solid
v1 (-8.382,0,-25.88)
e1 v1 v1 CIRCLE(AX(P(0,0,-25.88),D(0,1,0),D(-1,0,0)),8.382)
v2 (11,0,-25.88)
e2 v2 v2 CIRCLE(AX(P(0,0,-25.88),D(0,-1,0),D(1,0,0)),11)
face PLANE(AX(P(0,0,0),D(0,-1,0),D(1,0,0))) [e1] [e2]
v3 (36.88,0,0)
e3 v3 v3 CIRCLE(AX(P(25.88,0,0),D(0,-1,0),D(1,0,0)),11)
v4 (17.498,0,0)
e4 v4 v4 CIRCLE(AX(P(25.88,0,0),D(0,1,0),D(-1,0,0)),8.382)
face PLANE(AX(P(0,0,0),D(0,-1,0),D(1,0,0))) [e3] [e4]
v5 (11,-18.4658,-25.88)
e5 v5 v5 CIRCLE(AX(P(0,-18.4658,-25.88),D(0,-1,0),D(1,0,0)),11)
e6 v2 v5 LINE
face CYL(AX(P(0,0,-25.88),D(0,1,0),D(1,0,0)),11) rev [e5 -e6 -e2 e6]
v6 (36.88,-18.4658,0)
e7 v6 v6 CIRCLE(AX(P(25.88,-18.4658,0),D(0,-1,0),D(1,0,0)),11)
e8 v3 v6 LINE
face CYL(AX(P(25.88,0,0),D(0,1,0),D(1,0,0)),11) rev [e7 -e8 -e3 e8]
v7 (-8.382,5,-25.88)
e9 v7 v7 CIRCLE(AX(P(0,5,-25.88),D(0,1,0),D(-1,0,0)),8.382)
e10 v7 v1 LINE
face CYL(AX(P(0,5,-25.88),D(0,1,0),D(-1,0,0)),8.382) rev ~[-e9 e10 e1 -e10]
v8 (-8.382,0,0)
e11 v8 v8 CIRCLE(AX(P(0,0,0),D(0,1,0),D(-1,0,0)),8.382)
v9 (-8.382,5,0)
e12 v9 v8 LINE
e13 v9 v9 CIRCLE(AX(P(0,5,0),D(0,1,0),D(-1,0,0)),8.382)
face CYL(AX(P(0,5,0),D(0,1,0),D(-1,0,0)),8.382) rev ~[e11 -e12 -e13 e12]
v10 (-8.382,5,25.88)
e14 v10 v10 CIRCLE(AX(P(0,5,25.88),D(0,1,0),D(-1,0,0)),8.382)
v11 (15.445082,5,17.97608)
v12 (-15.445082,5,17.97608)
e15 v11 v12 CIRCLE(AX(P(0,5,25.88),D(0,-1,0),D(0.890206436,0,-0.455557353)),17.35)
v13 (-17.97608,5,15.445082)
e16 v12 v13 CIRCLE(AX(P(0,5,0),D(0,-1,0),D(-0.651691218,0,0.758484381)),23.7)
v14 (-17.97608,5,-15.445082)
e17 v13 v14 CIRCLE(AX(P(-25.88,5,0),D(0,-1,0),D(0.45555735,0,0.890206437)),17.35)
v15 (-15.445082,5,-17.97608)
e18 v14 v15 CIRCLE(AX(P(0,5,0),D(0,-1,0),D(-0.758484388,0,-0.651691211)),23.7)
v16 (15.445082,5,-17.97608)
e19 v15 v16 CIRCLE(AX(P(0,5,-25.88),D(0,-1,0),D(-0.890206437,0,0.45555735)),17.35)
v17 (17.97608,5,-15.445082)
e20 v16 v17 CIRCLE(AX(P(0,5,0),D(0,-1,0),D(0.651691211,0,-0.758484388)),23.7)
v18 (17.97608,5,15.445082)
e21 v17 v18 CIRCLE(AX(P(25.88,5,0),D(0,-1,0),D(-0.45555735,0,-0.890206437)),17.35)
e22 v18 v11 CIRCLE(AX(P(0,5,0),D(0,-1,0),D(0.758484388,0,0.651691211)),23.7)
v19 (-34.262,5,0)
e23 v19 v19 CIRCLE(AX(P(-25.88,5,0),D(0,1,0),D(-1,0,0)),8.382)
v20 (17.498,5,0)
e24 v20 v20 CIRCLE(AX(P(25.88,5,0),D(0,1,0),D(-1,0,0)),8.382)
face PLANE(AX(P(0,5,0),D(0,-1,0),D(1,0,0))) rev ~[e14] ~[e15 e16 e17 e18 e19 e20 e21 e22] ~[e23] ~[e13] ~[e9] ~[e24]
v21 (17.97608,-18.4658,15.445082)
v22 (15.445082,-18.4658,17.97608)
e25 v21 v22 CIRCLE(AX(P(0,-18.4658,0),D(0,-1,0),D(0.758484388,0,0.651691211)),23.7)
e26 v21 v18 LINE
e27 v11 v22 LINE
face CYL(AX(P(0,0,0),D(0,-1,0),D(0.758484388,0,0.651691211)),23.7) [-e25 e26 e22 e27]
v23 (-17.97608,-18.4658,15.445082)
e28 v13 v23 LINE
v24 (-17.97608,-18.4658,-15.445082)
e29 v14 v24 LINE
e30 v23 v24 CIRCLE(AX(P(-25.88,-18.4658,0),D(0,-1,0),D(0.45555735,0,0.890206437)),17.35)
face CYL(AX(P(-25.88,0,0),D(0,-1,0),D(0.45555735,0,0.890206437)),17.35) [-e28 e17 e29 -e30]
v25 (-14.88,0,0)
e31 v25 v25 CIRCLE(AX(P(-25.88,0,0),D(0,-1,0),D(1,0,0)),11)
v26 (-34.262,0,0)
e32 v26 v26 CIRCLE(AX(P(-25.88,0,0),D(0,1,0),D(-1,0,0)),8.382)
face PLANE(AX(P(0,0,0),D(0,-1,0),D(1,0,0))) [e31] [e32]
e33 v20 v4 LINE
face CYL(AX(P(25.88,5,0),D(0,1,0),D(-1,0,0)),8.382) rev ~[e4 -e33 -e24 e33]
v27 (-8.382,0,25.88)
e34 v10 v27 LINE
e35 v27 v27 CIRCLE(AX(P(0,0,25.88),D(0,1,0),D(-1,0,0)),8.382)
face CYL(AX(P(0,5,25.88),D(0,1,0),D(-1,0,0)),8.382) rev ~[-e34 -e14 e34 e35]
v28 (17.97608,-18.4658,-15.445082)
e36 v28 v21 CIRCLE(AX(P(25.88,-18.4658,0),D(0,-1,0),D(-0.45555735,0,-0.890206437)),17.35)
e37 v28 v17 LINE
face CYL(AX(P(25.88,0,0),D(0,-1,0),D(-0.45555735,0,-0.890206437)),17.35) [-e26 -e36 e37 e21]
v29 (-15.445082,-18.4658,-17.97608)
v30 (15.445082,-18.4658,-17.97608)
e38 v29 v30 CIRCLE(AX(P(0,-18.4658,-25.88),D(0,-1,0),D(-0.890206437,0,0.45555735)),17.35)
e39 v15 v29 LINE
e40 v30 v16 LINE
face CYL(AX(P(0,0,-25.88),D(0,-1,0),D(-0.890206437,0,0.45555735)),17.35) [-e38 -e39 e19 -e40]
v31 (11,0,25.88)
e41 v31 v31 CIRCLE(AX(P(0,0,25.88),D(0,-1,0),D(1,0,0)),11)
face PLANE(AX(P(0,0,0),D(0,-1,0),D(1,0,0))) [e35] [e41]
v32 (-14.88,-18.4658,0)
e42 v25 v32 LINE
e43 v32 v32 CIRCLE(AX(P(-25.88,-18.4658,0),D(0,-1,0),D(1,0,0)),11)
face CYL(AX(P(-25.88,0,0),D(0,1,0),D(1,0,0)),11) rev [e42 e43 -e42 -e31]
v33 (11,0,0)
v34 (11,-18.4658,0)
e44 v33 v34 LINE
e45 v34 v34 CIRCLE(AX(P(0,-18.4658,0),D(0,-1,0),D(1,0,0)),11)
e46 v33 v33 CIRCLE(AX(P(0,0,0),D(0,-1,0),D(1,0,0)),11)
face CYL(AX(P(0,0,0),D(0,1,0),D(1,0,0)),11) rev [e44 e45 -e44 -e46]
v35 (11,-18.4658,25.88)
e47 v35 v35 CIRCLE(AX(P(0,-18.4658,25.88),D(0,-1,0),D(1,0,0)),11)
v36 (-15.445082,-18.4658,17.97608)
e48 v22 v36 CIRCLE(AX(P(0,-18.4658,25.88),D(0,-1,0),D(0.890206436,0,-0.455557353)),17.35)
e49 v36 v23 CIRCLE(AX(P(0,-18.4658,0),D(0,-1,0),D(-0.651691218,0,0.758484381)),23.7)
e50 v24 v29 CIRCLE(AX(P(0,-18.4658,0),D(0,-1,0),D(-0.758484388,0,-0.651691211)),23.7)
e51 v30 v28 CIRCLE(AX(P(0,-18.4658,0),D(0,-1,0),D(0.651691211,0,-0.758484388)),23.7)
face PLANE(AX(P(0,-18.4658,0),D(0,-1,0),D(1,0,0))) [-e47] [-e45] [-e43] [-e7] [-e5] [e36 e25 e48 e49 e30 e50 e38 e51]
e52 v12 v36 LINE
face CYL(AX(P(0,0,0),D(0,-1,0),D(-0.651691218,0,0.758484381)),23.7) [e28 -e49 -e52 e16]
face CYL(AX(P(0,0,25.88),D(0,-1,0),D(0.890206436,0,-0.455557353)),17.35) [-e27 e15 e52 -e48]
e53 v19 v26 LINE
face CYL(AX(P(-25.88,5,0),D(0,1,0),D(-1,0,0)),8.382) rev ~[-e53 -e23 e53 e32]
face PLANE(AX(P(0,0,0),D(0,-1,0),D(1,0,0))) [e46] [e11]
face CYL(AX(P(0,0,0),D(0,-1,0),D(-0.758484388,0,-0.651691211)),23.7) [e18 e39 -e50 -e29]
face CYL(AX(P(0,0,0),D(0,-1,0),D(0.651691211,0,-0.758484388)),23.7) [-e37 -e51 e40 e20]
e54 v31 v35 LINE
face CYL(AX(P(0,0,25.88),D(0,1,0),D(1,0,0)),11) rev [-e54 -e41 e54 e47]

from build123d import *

# Parameters (mm, degrees)
F0_R     = 11
F1_DEPTH = 18.4658
F2_DEPTH = 5
F3_R     = 8.382
F4_DEPTH = 25.4


# Not quite as in the source:
# - a feature of the source that left no trace in its solid (it failed there, or was rolled back) is left out


with BuildPart() as f1:
    # F0 (on Front) → F1 (new body)
    with BuildSketch(Plane.XZ):
        with BuildLine():
            ThreePointArc((17.9760799845, 15.4450816893), (16.7584308008, 16.7584306274), (15.4450818753, 17.9760798247))
            ThreePointArc((15.4450818753, 17.9760798247), (0, 43.2300002384), (-15.4450818753, 17.9760798247))
            ThreePointArc((-15.4450818753, 17.9760798247), (-16.7584308008, 16.7584306274), (-17.9760799845, 15.4450816893))
            ThreePointArc((-17.9760799845, 15.4450816893), (-43.23, 0), (-17.9760799845, -15.4450816893))
            ThreePointArc((-17.9760799845, -15.4450816893), (-16.7584307141, -16.7584307141), (-15.4450816893, -17.9760799845))
            ThreePointArc((-15.4450816893, -17.9760799845), (0, -43.23), (15.4450816893, -17.9760799845))
            ThreePointArc((15.4450816893, -17.9760799845), (16.7584307141, -16.7584307141), (17.9760799845, -15.4450816893))
            ThreePointArc((17.9760799845, -15.4450816893), (43.23, 0), (17.9760799845, 15.4450816893))
        make_face()
        with Locations((-25.88, 0)):
            Circle(F0_R, mode=Mode.SUBTRACT)
        with Locations((0, -25.88)):
            Circle(F0_R, mode=Mode.SUBTRACT)
        Circle(F0_R, mode=Mode.SUBTRACT)
        with Locations((25.88, 0)):
            Circle(F0_R, mode=Mode.SUBTRACT)
        with Locations((0, 25.88)):
            Circle(F0_R, mode=Mode.SUBTRACT)
    extrude(amount=F1_DEPTH)

    # F0 (on Front) → F2 (join)
    with BuildSketch(Plane.XZ):
        with BuildLine():
            ThreePointArc((17.9760799845, 15.4450816893), (16.7584308008, 16.7584306274), (15.4450818753, 17.9760798247))
            ThreePointArc((15.4450818753, 17.9760798247), (0, 43.2300002384), (-15.4450818753, 17.9760798247))
            ThreePointArc((-15.4450818753, 17.9760798247), (-16.7584308008, 16.7584306274), (-17.9760799845, 15.4450816893))
            ThreePointArc((-17.9760799845, 15.4450816893), (-43.23, 0), (-17.9760799845, -15.4450816893))
            ThreePointArc((-17.9760799845, -15.4450816893), (-16.7584307141, -16.7584307141), (-15.4450816893, -17.9760799845))
            ThreePointArc((-15.4450816893, -17.9760799845), (0, -43.23), (15.4450816893, -17.9760799845))
            ThreePointArc((15.4450816893, -17.9760799845), (16.7584307141, -16.7584307141), (17.9760799845, -15.4450816893))
            ThreePointArc((17.9760799845, -15.4450816893), (43.23, 0), (17.9760799845, 15.4450816893))
        make_face()
        with Locations((-25.88, 0)):
            Circle(F0_R, mode=Mode.SUBTRACT)
        with Locations((0, -25.88)):
            Circle(F0_R, mode=Mode.SUBTRACT)
        Circle(F0_R, mode=Mode.SUBTRACT)
        with Locations((25.88, 0)):
            Circle(F0_R, mode=Mode.SUBTRACT)
        with Locations((0, 25.88)):
            Circle(F0_R, mode=Mode.SUBTRACT)
        with Locations((0, 25.88)):
            Circle(F0_R)
        with Locations((25.88, 0)):
            Circle(F0_R)
        Circle(F0_R)
        with Locations((-25.88, 0)):
            Circle(F0_R)
        with Locations((0, -25.88)):
            Circle(F0_R)
    extrude(amount=-F2_DEPTH)

    # F3 (on face) → F4 (cut)
    with BuildSketch(Plane(origin=(0, 5, 0), x_dir=(-1, 0, 0), z_dir=(0, 1, 0))):
        with Locations((0, 25.88)):
            Circle(F3_R)
        with Locations((-25.88, 0)):
            Circle(F3_R)
        Circle(F3_R)
        with Locations((0, -25.88)):
            Circle(F3_R)
        with Locations((25.88, 0)):
            Circle(F3_R)
    extrude(amount=-F4_DEPTH, mode=Mode.SUBTRACT)


solid = f1.part
